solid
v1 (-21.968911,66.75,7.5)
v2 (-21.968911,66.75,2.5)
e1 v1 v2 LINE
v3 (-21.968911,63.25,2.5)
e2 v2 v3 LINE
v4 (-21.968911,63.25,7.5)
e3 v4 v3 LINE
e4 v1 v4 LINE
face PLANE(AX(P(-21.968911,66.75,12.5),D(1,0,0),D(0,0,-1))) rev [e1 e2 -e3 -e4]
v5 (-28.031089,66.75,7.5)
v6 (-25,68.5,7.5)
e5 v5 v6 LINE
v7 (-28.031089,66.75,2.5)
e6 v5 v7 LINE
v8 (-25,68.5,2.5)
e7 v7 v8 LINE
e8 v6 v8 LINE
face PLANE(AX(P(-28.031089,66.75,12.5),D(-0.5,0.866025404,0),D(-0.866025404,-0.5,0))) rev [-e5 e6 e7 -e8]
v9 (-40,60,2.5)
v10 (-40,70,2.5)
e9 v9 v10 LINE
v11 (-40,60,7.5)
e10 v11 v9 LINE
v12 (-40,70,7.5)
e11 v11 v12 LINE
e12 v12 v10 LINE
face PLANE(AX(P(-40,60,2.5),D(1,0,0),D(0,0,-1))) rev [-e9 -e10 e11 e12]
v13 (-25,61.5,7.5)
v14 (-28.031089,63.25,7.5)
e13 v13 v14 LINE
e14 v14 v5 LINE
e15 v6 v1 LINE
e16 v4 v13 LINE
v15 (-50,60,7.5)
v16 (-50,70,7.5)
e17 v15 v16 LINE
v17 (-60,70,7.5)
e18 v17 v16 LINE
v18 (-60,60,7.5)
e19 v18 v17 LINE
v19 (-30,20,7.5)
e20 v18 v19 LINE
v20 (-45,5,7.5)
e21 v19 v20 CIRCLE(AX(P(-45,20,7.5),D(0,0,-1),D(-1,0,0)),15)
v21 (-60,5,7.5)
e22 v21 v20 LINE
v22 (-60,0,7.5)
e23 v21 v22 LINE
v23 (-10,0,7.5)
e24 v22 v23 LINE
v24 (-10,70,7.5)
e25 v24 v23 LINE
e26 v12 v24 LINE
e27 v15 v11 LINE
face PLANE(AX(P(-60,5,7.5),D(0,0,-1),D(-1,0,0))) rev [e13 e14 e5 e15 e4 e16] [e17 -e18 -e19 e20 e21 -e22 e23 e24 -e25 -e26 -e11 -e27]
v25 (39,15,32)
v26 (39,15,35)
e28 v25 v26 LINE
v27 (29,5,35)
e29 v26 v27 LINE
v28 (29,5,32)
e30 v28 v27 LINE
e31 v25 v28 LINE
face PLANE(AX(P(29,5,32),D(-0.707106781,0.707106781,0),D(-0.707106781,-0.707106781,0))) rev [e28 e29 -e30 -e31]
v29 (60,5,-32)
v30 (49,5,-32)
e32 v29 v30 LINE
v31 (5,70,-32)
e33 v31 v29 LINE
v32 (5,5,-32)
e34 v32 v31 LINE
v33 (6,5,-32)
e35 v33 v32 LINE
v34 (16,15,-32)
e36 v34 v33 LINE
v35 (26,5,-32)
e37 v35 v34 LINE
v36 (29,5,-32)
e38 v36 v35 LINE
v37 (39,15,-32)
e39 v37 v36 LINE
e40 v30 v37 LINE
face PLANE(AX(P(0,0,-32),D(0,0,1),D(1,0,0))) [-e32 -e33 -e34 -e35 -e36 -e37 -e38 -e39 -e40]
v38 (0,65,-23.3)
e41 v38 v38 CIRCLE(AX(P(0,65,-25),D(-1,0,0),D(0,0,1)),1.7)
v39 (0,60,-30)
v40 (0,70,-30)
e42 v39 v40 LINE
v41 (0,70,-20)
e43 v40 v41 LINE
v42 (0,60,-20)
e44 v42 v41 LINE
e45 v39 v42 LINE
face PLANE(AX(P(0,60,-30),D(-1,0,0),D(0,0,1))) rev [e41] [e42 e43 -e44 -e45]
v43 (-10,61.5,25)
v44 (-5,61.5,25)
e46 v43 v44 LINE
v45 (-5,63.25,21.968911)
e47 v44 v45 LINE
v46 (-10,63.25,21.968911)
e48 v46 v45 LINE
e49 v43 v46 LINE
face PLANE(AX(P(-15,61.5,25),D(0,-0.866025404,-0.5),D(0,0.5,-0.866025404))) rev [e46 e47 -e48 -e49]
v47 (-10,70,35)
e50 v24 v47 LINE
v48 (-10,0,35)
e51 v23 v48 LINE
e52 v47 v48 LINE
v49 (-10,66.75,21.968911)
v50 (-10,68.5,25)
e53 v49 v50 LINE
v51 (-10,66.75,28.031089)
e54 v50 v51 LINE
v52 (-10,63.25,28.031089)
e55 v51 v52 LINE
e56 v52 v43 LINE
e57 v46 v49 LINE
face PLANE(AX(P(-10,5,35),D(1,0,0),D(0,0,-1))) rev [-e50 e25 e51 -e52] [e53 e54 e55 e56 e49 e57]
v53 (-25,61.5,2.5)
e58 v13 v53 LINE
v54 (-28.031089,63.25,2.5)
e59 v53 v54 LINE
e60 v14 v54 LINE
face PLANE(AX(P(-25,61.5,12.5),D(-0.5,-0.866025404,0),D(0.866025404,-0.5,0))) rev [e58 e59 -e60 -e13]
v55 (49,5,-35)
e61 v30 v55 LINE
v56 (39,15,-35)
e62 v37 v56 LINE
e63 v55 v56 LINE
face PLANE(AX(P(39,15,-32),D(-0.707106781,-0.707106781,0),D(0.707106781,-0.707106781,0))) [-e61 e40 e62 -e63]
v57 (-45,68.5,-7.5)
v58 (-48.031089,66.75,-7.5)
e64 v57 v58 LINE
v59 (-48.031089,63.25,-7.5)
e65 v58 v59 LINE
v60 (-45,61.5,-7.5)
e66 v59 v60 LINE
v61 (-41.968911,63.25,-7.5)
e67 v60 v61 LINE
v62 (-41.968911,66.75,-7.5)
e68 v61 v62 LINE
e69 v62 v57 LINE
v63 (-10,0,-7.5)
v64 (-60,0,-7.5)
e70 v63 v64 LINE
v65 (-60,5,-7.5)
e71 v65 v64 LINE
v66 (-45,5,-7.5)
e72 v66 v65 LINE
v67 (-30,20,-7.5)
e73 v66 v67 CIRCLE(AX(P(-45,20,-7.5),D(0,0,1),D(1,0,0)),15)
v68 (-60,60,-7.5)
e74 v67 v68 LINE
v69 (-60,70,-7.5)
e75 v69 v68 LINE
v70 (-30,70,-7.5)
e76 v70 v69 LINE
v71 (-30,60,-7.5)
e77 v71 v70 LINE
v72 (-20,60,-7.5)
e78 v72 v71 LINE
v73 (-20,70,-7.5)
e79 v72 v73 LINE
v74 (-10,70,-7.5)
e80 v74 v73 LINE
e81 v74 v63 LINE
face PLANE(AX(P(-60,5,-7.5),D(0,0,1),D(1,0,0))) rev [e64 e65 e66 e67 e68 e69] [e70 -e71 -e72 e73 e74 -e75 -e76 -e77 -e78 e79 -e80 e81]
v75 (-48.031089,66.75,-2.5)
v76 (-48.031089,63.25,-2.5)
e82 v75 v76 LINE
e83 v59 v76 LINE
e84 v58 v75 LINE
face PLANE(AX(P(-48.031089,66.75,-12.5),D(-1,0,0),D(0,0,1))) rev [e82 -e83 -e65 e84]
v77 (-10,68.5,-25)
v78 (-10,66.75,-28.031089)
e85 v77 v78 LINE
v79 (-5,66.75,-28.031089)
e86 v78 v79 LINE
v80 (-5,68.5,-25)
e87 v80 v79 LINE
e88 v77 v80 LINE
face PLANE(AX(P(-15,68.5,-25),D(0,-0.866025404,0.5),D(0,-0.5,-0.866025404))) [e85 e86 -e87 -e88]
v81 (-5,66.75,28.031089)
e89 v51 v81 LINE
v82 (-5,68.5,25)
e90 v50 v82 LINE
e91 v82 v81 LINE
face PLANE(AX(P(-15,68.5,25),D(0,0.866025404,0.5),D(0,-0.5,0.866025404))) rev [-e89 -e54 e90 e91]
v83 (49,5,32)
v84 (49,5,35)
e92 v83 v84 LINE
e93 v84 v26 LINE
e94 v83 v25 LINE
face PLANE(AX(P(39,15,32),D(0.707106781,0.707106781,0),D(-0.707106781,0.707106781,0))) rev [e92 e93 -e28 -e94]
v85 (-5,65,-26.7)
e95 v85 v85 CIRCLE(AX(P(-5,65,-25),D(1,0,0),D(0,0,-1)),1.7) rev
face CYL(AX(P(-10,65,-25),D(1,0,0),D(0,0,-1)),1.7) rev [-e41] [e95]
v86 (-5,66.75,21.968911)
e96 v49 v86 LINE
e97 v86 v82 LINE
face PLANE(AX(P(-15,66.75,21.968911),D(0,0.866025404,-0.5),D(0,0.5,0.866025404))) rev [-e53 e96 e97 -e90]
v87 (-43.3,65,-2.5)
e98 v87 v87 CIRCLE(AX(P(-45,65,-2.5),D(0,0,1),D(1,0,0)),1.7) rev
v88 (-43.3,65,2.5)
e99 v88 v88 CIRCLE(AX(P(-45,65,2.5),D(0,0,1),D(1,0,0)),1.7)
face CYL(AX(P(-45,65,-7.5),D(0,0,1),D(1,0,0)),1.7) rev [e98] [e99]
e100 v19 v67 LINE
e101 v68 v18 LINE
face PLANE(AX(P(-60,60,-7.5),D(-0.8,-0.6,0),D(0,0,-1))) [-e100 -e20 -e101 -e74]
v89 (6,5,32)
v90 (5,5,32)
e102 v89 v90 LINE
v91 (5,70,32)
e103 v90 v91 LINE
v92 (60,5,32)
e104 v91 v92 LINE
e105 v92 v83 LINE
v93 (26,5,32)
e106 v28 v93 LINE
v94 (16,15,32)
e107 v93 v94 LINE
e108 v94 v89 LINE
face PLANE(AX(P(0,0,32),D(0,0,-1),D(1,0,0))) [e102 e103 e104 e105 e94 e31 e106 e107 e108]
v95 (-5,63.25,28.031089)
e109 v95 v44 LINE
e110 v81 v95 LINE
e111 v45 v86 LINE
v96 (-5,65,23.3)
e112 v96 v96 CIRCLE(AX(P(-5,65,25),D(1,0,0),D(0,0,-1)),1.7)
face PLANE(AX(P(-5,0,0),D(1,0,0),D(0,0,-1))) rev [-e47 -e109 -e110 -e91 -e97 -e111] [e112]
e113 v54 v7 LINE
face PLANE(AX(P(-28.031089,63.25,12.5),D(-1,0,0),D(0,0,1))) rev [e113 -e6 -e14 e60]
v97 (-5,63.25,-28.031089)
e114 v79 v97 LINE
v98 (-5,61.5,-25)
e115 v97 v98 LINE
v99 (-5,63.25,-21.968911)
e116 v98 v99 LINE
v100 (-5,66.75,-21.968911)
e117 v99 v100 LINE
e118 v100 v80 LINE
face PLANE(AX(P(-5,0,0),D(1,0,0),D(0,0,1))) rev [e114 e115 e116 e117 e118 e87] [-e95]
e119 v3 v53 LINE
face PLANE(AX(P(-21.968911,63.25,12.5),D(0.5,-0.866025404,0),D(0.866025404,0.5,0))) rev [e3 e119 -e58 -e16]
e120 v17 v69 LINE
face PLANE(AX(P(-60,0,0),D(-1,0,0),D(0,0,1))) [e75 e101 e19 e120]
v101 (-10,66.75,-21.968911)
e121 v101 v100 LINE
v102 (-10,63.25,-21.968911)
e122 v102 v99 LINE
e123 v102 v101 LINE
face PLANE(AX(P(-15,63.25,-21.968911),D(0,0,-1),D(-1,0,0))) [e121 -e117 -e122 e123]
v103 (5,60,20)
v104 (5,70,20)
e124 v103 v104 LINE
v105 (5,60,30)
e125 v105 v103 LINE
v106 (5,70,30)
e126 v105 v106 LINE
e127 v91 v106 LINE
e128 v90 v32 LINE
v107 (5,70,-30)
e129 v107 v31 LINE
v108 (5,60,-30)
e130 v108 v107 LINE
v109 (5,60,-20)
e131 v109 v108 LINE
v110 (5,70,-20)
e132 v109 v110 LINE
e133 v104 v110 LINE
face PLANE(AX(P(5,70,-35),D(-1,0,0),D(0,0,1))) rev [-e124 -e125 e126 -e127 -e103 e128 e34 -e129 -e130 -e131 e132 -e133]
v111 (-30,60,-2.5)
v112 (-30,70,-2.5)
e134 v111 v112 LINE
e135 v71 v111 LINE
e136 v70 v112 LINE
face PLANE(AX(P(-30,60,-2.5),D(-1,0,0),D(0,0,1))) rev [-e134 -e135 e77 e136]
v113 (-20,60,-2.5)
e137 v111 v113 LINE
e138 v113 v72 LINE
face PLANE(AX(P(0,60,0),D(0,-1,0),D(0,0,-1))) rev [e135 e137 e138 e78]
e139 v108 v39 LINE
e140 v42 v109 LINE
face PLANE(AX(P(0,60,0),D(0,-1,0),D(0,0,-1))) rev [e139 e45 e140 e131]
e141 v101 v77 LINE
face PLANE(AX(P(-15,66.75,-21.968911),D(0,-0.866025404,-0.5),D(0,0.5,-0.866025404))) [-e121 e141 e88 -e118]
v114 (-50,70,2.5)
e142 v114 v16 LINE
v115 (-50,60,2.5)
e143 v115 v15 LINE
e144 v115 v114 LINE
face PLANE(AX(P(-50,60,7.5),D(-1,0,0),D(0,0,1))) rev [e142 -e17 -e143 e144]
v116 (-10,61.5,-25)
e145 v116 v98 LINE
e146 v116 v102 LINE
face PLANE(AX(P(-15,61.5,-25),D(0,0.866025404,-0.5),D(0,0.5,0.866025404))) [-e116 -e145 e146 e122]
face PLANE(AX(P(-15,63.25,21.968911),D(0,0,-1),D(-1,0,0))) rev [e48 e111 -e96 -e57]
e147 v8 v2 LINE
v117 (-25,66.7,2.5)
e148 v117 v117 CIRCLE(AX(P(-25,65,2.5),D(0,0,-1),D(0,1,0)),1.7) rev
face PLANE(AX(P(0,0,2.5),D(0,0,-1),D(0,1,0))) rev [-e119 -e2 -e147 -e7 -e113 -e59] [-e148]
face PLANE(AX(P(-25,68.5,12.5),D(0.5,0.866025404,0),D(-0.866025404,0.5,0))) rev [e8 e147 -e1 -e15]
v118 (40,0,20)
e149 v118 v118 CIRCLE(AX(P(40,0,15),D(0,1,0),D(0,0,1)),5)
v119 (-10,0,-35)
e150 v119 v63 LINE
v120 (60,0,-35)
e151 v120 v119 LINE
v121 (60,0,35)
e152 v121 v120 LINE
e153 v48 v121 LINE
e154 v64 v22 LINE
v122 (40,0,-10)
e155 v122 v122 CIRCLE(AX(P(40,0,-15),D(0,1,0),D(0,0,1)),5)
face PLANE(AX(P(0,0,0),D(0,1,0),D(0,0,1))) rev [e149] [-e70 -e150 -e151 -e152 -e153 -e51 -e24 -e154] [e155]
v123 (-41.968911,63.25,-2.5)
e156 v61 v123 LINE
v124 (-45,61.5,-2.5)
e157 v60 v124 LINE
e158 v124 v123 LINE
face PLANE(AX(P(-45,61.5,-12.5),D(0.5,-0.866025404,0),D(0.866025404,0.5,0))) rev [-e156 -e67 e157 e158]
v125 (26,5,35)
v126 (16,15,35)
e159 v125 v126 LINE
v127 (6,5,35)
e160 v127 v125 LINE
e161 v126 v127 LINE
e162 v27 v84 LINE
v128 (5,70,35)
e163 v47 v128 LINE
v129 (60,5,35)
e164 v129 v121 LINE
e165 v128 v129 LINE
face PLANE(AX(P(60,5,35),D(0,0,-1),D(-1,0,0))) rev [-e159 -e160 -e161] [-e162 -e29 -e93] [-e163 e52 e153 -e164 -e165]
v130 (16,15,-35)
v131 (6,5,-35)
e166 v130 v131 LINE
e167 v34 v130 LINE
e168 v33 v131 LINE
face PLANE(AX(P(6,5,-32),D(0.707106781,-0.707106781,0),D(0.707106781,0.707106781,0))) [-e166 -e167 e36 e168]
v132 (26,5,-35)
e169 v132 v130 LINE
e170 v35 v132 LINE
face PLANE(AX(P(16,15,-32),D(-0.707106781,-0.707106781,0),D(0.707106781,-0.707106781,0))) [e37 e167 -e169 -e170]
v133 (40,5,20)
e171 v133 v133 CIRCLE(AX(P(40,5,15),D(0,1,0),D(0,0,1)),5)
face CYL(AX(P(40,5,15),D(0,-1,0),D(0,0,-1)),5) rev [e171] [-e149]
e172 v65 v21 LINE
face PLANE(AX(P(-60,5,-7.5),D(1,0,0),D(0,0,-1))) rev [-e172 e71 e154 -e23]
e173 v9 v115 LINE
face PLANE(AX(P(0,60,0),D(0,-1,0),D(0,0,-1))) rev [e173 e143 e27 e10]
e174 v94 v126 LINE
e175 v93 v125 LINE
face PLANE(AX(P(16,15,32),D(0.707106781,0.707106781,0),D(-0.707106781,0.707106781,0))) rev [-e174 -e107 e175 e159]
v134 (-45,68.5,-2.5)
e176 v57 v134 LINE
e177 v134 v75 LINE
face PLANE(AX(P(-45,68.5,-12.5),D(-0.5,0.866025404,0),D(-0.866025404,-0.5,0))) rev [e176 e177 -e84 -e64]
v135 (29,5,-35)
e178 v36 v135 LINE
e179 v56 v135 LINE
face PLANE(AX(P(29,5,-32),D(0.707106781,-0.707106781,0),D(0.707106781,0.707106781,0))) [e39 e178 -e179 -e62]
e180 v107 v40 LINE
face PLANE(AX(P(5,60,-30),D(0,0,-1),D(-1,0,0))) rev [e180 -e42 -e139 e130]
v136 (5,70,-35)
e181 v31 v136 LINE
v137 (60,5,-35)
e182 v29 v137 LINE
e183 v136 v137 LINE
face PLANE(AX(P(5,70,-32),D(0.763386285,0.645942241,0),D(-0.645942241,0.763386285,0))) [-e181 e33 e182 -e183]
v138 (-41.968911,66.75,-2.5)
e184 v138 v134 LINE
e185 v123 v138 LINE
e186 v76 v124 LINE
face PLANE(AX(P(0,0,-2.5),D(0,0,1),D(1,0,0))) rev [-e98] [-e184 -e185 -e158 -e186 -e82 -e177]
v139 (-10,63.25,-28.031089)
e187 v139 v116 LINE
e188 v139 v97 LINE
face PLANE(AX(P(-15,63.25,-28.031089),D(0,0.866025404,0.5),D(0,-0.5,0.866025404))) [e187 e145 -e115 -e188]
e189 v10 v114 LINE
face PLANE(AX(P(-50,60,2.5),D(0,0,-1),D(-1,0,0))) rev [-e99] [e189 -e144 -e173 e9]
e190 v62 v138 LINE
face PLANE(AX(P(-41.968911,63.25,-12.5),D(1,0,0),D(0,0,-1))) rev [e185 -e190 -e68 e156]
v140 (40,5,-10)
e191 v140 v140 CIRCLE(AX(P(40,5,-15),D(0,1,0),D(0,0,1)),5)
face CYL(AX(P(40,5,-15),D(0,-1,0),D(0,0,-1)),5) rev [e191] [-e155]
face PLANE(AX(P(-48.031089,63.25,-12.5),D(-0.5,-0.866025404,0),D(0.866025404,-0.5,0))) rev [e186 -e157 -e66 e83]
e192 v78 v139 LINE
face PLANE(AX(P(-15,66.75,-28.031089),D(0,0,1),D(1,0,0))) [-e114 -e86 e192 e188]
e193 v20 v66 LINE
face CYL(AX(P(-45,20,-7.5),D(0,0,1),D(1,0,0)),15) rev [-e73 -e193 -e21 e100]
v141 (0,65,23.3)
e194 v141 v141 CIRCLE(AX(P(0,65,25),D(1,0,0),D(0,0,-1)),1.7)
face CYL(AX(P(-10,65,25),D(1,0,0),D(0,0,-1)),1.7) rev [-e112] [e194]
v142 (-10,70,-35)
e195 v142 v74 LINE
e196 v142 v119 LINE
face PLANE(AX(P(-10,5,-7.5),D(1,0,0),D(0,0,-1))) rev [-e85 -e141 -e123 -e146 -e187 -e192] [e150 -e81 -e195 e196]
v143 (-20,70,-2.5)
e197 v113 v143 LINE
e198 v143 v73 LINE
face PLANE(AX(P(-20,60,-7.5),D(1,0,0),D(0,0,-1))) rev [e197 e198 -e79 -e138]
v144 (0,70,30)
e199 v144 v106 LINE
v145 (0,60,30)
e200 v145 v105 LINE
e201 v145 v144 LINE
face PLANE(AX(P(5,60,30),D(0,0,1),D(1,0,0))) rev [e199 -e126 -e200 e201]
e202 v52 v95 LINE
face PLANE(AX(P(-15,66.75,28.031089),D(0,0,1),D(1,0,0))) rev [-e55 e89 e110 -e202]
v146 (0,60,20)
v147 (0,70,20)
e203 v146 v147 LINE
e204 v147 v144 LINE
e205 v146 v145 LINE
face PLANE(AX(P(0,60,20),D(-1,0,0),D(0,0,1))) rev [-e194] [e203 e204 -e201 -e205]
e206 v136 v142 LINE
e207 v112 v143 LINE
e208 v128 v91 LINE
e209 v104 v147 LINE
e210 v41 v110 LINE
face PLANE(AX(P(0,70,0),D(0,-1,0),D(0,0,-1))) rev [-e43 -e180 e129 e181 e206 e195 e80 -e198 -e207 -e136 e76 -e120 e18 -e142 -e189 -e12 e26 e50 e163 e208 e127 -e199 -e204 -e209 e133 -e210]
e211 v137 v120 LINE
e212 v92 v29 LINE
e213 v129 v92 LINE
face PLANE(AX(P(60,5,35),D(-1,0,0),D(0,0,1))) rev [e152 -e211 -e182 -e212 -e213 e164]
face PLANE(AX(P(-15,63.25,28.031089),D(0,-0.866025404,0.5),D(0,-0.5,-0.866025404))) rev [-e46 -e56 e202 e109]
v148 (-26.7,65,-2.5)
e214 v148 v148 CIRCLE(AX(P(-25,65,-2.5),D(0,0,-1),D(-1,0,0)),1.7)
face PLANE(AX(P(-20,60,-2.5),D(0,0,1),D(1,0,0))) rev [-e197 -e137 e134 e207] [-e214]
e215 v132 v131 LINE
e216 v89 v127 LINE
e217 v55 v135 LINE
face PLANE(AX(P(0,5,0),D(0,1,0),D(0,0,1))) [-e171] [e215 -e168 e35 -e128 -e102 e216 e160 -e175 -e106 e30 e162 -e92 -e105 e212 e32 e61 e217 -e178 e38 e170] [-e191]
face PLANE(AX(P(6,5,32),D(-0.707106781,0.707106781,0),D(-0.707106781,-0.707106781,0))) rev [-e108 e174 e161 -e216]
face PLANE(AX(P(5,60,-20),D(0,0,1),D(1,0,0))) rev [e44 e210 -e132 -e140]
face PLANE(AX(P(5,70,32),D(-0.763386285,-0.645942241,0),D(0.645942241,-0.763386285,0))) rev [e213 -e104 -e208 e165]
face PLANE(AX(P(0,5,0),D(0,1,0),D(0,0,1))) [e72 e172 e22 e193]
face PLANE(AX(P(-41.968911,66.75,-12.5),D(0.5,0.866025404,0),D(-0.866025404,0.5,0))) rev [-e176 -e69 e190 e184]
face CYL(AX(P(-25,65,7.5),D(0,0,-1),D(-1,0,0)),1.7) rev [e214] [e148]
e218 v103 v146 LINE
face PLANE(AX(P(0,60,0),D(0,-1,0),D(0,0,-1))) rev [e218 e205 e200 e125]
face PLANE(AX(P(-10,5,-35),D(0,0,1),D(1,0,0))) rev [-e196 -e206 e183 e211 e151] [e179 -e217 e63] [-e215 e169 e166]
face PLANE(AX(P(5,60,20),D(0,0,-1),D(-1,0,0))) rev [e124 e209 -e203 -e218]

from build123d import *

# Parameters (mm, degrees)
SKETCH1_R           = 5
BOSS_EXTRUDE1_DEPTH = 5
BOSS_EXTRUDE2_DEPTH = 65
SKETCH3_W           = 15
SKETCH3_H           = 10
BOSS_EXTRUDE3_DEPTH = 30
CHAMFER2_SIZE2      = 40
CHAMFER2_SIZE       = 30
SKETCH4_W           = 10
SKETCH4_H           = 5
SKETCH4_W_2         = 5
SKETCH4_H_2         = 10
CUT_EXTRUDE1_DEPTH  = 10
CUT_EXTRUDE2_START  = -5
CUT_EXTRUDE2_DEPTH  = 10
SKETCH6_R           = 1.7
CUT_EXTRUDE3_DEPTH  = 10
SKETCH7_R           = 1.7
CUT_EXTRUDE4_DEPTH  = 10
CUT_EXTRUDE5_START  = -5
CUT_EXTRUDE5_DEPTH  = 10
SKETCH9_R           = 1.7
CUT_EXTRUDE6_DEPTH  = 10
CUT_EXTRUDE7_START  = -5
CUT_EXTRUDE7_DEPTH  = 10
FILLET2_R           = 15
BOSS_EXTRUDE4_DEPTH = 3


with BuildPart() as part:
    # Sketch1 → Boss-Extrude1 (new body)
    with BuildSketch(Plane(origin=(0, 0, 0), x_dir=(1, 0, 0), z_dir=(0, 1, 0))):
        Polygon((60, -35), (60, 35), (-10, 35), (-10, 7.5), (-60, 7.5), (-60, -7.5), (-10, -7.5), (-10, -35), align=None)
        with Locations(Location((40, 15, 0), (0, 0, 270))):
            Circle(SKETCH1_R, mode=Mode.SUBTRACT)
        with Locations(Location((40, -15, 0), (0, 0, 270))):
            Circle(SKETCH1_R, mode=Mode.SUBTRACT)
    extrude(amount=BOSS_EXTRUDE1_DEPTH)

    # Sketch2 → Boss-Extrude2 (add)
    with BuildSketch(Plane(origin=(0, 5, 0), x_dir=(1, 0, 0), z_dir=(0, 1, 0))):
        Polygon((-10, 35), (-10, 7.5), (-30, 7.5), (-30, -7.5), (-10, -7.5), (-10, -35), (5, -35), (5, 35), align=None)
    extrude(amount=BOSS_EXTRUDE2_DEPTH)

    # Sketch3 → Boss-Extrude3 (add)
    with BuildSketch(Plane.ZY.offset(30)):
        with Locations((0, 65)):
            Rectangle(SKETCH3_W, SKETCH3_H)
    extrude(amount=BOSS_EXTRUDE3_DEPTH)

    # Chamfer2
    chamfer2_edges = [part.edges().sort_by_distance(p)[0] for p in [
        (-30, 60, 0),
    ]]
    chamfer2_side = [part.faces().sort_by_distance(p)[0] for p in [
        (-30.6, 60, 0),
    ]]
    chamfer(chamfer2_edges, length=CHAMFER2_SIZE - 0.0001, length2=CHAMFER2_SIZE2 - 0.0001, reference=chamfer2_side[0])  # a hair under: the kernel refuses the full size

    # Sketch4 → Cut-Extrude1 (cut)
    with BuildSketch(Plane(origin=(0, 70, 0), x_dir=(1, 0, 0), z_dir=(0, 1, 0))):
        with Locations((-25, 5)):
            Rectangle(SKETCH4_W, SKETCH4_H)
        with Locations((-45, -5)):
            Rectangle(SKETCH4_W, SKETCH4_H)
        with Locations((2.5, 25)):
            Rectangle(SKETCH4_W_2, SKETCH4_H_2)
        with Locations((2.5, -25)):
            Rectangle(SKETCH4_W_2, SKETCH4_H_2)
    extrude(amount=-CUT_EXTRUDE1_DEPTH, mode=Mode.SUBTRACT)

    # Sketch5 → Cut-Extrude2 (cut)
    with BuildSketch(Plane(origin=(0, 0, 0), x_dir=(0, 0, -1), z_dir=(1, 0, 0)).offset(CUT_EXTRUDE2_START)):
        Polygon((-25, 61.5), (-21.968911087, 63.25), (-21.968911087, 66.75), (-25, 68.5), (-28.031088913, 66.75), (-28.031088913, 63.25), align=None)
    cut_extrude2 = extrude(amount=-CUT_EXTRUDE2_DEPTH, mode=Mode.SUBTRACT)

    # Sketch6 → Cut-Extrude3 (cut)
    with BuildSketch(Plane(origin=(0, 0, 0), x_dir=(0, 0, -1), z_dir=(1, 0, 0))):
        with Locations((-25, 65)):
            Circle(SKETCH6_R)
    cut_extrude3 = extrude(amount=-CUT_EXTRUDE3_DEPTH, mode=Mode.SUBTRACT)

    # Mirror1: Cut-Extrude2 across plane
    add(cut_extrude2.mirror(Plane.XY), mode=Mode.SUBTRACT)

    # Mirror2: Cut-Extrude3 across plane
    add(cut_extrude3.mirror(Plane.XY), mode=Mode.SUBTRACT)

    # Sketch7 → Cut-Extrude4 (cut)
    with BuildSketch(Plane.XY.offset(2.5)):
        with Locations((-45, 65)):
            Circle(SKETCH7_R)
    extrude(amount=-CUT_EXTRUDE4_DEPTH, mode=Mode.SUBTRACT)

    # Sketch8 → Cut-Extrude5 (cut)
    with BuildSketch(Plane.XY.offset(2.5).offset(CUT_EXTRUDE5_START)):
        Polygon((-45, 68.5), (-48.031088913, 66.75), (-48.031088913, 63.25), (-45, 61.5), (-41.968911087, 63.25), (-41.968911087, 66.75), align=None)
    extrude(amount=-CUT_EXTRUDE5_DEPTH, mode=Mode.SUBTRACT)

    # Sketch9 → Cut-Extrude6 (cut)
    with BuildSketch(Plane(origin=(0, 0, -2.5), x_dir=(-1, 0, 0), z_dir=(0, 0, -1))):
        with Locations((25, 65)):
            Circle(SKETCH9_R)
    extrude(amount=-CUT_EXTRUDE6_DEPTH, mode=Mode.SUBTRACT)

    # Sketch10 → Cut-Extrude7 (cut)
    with BuildSketch(Plane(origin=(0, 0, -2.5), x_dir=(-1, 0, 0), z_dir=(0, 0, -1)).offset(CUT_EXTRUDE7_START)):
        Polygon((25, 68.5), (21.968911087, 66.75), (21.968911087, 63.25), (25, 61.5), (28.031088913, 63.25), (28.031088913, 66.75), align=None)
    extrude(amount=-CUT_EXTRUDE7_DEPTH, mode=Mode.SUBTRACT)

    # Fillet2
    fillet2_edges = [part.edges().sort_by_distance(p)[0] for p in [
        (-30, 5, 0),
    ]]
    fillet(fillet2_edges, radius=FILLET2_R)

    # Sketch11 → Boss-Extrude4 (add)
    with BuildSketch(Plane(origin=(0, 0, -35), x_dir=(-1, 0, 0), z_dir=(0, 0, -1))):
        Polygon((-5, 70), (-60, 5), (-49, 5), (-39, 15), (-29, 5), (-26, 5), (-16, 15), (-6, 5), (-5, 5), align=None)
    boss_extrude4 = extrude(amount=-BOSS_EXTRUDE4_DEPTH)

    # Mirror3: Boss-Extrude4 across plane
    add(boss_extrude4.mirror(Plane.XY))


solid = part.part
